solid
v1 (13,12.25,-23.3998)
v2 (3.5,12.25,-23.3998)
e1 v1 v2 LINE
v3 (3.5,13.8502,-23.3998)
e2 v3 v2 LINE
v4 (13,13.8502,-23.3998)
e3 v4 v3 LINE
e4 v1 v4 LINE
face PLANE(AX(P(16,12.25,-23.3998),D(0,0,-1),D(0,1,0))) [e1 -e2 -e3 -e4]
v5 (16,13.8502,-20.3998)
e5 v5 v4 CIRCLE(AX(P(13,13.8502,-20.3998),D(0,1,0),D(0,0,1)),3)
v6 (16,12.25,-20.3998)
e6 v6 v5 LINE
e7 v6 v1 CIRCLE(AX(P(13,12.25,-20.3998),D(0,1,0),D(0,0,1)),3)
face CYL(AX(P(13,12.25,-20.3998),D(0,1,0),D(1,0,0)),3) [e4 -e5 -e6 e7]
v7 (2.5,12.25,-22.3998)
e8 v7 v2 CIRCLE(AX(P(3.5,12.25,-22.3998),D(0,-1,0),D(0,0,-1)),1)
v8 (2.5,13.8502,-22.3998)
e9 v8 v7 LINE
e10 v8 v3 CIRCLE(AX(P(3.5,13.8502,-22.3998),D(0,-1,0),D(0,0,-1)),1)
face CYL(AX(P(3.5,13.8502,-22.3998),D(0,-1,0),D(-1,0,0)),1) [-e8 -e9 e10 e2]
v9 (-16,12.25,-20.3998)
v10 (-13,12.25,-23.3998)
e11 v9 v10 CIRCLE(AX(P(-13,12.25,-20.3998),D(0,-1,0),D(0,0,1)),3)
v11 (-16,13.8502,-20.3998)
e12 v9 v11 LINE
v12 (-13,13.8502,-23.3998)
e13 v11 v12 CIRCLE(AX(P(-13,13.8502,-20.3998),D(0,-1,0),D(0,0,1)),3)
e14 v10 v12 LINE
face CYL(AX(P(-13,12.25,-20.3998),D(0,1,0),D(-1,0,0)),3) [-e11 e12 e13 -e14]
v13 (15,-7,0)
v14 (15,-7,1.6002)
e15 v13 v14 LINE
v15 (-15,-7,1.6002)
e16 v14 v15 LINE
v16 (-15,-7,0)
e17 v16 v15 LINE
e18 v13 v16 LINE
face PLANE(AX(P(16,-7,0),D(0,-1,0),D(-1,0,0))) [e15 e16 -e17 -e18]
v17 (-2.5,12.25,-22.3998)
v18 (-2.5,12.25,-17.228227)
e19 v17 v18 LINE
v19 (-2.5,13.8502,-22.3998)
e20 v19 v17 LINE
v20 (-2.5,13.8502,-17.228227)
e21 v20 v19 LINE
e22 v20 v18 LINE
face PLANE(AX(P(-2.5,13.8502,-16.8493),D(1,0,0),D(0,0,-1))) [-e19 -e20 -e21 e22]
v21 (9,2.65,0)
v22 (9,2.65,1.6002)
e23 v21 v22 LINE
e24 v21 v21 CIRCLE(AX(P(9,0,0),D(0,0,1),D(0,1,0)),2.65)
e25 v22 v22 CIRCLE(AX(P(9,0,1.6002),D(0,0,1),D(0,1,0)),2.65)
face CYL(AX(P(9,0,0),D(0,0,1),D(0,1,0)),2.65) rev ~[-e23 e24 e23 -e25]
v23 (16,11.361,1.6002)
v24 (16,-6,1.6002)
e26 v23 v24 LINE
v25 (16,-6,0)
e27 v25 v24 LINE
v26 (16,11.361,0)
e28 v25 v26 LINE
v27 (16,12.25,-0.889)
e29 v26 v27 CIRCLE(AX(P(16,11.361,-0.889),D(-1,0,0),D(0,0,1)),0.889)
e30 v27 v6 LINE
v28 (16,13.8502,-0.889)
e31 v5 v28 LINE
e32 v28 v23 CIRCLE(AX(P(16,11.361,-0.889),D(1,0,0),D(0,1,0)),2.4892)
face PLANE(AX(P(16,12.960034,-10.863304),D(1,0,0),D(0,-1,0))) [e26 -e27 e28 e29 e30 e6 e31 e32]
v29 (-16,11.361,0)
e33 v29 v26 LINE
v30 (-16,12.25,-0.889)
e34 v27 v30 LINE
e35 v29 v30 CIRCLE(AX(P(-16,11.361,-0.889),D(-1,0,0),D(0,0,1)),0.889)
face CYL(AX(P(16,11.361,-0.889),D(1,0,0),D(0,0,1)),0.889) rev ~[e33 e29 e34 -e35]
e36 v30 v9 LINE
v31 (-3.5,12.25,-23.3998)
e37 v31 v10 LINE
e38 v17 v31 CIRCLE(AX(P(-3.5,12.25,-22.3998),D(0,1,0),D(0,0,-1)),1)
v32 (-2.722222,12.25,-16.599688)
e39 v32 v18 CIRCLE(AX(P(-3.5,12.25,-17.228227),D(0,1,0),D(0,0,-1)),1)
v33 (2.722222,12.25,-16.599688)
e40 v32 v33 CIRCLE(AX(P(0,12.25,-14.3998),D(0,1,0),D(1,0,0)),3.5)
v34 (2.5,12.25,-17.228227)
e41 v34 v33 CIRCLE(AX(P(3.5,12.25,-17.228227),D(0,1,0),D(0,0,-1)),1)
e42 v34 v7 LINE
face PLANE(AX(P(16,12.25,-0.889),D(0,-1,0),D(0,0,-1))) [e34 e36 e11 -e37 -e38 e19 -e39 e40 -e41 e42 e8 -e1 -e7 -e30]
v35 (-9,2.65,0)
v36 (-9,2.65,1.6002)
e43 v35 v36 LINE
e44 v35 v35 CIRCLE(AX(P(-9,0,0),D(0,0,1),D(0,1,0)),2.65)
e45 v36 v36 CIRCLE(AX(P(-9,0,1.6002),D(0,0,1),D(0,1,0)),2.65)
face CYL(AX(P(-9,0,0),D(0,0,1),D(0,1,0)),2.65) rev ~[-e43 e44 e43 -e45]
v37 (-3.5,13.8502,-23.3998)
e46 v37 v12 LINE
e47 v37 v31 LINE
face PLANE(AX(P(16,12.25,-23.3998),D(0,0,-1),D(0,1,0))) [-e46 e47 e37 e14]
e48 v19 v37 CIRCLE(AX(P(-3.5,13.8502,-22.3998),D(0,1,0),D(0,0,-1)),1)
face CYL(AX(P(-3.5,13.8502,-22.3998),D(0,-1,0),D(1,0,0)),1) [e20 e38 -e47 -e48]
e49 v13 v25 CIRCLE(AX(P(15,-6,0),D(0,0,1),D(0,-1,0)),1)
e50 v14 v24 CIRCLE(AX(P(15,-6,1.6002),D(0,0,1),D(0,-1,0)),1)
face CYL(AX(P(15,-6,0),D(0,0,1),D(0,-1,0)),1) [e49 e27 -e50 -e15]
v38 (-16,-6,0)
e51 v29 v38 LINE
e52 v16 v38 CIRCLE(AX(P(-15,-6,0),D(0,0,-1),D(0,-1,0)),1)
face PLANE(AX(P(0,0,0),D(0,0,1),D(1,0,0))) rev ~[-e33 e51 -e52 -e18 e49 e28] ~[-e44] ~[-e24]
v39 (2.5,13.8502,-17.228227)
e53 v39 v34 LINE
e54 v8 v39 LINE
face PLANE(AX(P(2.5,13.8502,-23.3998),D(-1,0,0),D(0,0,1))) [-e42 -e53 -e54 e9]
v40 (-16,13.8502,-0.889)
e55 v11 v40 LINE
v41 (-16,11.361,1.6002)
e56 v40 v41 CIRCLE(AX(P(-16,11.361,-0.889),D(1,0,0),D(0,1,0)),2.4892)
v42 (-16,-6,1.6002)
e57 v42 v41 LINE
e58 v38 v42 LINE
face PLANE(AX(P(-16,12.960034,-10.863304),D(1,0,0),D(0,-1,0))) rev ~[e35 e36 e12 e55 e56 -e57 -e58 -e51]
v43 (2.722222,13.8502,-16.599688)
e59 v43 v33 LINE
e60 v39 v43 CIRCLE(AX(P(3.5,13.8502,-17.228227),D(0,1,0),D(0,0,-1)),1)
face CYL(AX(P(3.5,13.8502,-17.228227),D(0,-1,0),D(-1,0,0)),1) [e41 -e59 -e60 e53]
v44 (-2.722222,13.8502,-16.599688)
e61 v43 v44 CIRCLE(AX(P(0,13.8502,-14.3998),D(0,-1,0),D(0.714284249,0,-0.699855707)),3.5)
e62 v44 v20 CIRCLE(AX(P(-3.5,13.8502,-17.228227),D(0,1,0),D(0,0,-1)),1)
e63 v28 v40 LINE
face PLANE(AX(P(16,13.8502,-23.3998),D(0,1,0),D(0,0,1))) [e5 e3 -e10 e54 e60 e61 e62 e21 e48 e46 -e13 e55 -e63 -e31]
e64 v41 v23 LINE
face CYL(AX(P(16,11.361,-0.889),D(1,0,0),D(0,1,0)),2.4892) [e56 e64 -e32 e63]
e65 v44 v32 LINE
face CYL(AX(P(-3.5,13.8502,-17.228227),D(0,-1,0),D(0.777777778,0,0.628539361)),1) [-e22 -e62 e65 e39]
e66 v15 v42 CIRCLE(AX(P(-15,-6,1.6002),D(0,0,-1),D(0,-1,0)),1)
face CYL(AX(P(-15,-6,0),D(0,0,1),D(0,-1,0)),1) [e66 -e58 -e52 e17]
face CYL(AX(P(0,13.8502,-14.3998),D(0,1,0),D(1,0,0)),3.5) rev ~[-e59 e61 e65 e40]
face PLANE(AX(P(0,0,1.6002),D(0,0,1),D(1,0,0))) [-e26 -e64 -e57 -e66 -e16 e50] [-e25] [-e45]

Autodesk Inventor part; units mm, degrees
ref_plane "YZ Plane" through (0, 0, 0) normal (1, 0, 0) x (0, 1, 0)
ref_plane "XZ Plane" through (0, 0, 0) normal (0, 1, 0) x (-1, 0, 0)
ref_plane "XY Plane" through (0, 0, 0) normal (0, 0, 1) x (1, 0, 0)
sketch "Sketch1" plane through (0, 0, 0) normal (0, 0, 1) x (1, 0, 0)
  line L0 (16, -7) -> (-16, -7)
  line L1 (-16, -7) -> (-16, 7)
  line L2 (-16, 7) -> (16, 7)
  line L3 (16, 7) -> (16, -7)
  line L4 (16, -7) -> (-16, 7) construction
  line L5 (-16, -7) -> (16, 7) construction
  line L6 (-9, 0) -> (9, 0) construction
  line L7 (-16, 7) -> (16, 7)
  line L8 (16, 7) -> (16, 12.25)
  line L9 (16, 12.25) -> (-16, 12.25)
  line L10 (-16, 12.25) -> (-16, 7)
  point P0 (0, 0)
  dimension "d126" = 32
  dimension "d127" = 14
  dimension "d128" = 7
  dimension "d129" = 12.25
extrude "Plate4" add sketch "Sketch1" along normal blind 1.6002
fillet "Fillet7" radius 1 2 edges at (16, -7, 0.8001) (-16, -7, 0.8001)
hole "Hole4" at (-9, 0, 0) at (9, 0, 0) direction (0, 0, 1) diameter 5.3 end through all
sketch "Sketch10" plane through (16, 12.25, 0) normal (0, 1, 0) x (-1, 0, 0)
  line L0 (32, 0) -> (0, 0)
  line L1 (0, 0) -> (0, -23.3998)
  line L2 (0, -23.3998) -> (32, -23.3998)
  line L3 (32, -23.3998) -> (32, 0)
edge flange "Flange5" height 25 angle 90 thickness 1.6002 bend radius 0.889 thickness toward (0, 1, 0) relief tear relief width 1.6002 relief depth 0.8001 edges at (0, 12.25, 0) wall of the first edge with corners at (-16, 12.25, 0) (16, 12.25, 0) (16, 12.25, -23.3998) (-16, 12.25, -23.3998)
bend "Bend5"
corner "Corner5"
fillet "Fillet8" radius 3 2 edges at (16, 13.0501, -23.3998) (-16, 13.0501, -23.3998)
sketch "Sketch11" plane through (-16, 13.8502, -0.889) normal (0, 1, 0) x (1, 0, 0)
  arc A0 (32, 19.5108) -> (29, 22.5108) centre (29, 19.5108) ccw projected
  line L0 (3, 22.5108) -> (29, 22.5108) projected
  arc A1 (3, 22.5108) -> (0, 19.5108) centre (3, 19.5108) ccw projected
  line L1 (0, 0) -> (0, 19.5108) projected
  line L2 (0, 0) -> (32, 0) projected
  line L3 (32, 19.5108) -> (32, 0) projected
  circle A2 centre (16, 13.5108) radius 3.5
  line L4 (13.5, 22.5108) -> (18.5, 22.5108)
  line L5 (18.5, 22.5108) -> (18.5, 15.9603)
  line L6 (18.5, 15.9603) -> (13.5, 15.9603)
  line L7 (13.5, 15.9603) -> (13.5, 22.5108)
  point P0 (16, -0.889)
  point P1 (16, 22.5108)
  dimension "d149" = 7
  dimension "d150" = 9
  dimension "d151" = 5
extrude "Extrusion7" cut sketch "Sketch11" against normal through all contours L5 A2 L7 L0 | L6 A2 | A2 L6
fillet "Fillet9" radius 1 2 edges at (-2.5, 13.0501, -16.8493) (2.5, 13.0501, -16.8493)
fillet "Fillet10" radius 1 2 edges at (-2.5, 13.0501, -23.3998) (2.5, 13.0501, -23.3998)
equation "\"d71\" = Thickness"
equation "\"BendReliefWidth\" = Thickness"
equation "\"BendReliefDepth\" = 0.5 * Thickness"
equation "\"CornerReliefSize\" = 4 * Thickness"
equation "\"MinimumRemnant\" = 2 * Thickness"
equation "\"TransitionRadius\" = BendRadius"
equation "\"JacobiRadiusSize\" = BendRadius"
equation "\"GapSize\" = Thickness"
equation "\"Thickness\" = 1.6002"
equation "\"BendRadius\" = 0.889"
properties part number "Door Stop" material "Aluminum 6061"
